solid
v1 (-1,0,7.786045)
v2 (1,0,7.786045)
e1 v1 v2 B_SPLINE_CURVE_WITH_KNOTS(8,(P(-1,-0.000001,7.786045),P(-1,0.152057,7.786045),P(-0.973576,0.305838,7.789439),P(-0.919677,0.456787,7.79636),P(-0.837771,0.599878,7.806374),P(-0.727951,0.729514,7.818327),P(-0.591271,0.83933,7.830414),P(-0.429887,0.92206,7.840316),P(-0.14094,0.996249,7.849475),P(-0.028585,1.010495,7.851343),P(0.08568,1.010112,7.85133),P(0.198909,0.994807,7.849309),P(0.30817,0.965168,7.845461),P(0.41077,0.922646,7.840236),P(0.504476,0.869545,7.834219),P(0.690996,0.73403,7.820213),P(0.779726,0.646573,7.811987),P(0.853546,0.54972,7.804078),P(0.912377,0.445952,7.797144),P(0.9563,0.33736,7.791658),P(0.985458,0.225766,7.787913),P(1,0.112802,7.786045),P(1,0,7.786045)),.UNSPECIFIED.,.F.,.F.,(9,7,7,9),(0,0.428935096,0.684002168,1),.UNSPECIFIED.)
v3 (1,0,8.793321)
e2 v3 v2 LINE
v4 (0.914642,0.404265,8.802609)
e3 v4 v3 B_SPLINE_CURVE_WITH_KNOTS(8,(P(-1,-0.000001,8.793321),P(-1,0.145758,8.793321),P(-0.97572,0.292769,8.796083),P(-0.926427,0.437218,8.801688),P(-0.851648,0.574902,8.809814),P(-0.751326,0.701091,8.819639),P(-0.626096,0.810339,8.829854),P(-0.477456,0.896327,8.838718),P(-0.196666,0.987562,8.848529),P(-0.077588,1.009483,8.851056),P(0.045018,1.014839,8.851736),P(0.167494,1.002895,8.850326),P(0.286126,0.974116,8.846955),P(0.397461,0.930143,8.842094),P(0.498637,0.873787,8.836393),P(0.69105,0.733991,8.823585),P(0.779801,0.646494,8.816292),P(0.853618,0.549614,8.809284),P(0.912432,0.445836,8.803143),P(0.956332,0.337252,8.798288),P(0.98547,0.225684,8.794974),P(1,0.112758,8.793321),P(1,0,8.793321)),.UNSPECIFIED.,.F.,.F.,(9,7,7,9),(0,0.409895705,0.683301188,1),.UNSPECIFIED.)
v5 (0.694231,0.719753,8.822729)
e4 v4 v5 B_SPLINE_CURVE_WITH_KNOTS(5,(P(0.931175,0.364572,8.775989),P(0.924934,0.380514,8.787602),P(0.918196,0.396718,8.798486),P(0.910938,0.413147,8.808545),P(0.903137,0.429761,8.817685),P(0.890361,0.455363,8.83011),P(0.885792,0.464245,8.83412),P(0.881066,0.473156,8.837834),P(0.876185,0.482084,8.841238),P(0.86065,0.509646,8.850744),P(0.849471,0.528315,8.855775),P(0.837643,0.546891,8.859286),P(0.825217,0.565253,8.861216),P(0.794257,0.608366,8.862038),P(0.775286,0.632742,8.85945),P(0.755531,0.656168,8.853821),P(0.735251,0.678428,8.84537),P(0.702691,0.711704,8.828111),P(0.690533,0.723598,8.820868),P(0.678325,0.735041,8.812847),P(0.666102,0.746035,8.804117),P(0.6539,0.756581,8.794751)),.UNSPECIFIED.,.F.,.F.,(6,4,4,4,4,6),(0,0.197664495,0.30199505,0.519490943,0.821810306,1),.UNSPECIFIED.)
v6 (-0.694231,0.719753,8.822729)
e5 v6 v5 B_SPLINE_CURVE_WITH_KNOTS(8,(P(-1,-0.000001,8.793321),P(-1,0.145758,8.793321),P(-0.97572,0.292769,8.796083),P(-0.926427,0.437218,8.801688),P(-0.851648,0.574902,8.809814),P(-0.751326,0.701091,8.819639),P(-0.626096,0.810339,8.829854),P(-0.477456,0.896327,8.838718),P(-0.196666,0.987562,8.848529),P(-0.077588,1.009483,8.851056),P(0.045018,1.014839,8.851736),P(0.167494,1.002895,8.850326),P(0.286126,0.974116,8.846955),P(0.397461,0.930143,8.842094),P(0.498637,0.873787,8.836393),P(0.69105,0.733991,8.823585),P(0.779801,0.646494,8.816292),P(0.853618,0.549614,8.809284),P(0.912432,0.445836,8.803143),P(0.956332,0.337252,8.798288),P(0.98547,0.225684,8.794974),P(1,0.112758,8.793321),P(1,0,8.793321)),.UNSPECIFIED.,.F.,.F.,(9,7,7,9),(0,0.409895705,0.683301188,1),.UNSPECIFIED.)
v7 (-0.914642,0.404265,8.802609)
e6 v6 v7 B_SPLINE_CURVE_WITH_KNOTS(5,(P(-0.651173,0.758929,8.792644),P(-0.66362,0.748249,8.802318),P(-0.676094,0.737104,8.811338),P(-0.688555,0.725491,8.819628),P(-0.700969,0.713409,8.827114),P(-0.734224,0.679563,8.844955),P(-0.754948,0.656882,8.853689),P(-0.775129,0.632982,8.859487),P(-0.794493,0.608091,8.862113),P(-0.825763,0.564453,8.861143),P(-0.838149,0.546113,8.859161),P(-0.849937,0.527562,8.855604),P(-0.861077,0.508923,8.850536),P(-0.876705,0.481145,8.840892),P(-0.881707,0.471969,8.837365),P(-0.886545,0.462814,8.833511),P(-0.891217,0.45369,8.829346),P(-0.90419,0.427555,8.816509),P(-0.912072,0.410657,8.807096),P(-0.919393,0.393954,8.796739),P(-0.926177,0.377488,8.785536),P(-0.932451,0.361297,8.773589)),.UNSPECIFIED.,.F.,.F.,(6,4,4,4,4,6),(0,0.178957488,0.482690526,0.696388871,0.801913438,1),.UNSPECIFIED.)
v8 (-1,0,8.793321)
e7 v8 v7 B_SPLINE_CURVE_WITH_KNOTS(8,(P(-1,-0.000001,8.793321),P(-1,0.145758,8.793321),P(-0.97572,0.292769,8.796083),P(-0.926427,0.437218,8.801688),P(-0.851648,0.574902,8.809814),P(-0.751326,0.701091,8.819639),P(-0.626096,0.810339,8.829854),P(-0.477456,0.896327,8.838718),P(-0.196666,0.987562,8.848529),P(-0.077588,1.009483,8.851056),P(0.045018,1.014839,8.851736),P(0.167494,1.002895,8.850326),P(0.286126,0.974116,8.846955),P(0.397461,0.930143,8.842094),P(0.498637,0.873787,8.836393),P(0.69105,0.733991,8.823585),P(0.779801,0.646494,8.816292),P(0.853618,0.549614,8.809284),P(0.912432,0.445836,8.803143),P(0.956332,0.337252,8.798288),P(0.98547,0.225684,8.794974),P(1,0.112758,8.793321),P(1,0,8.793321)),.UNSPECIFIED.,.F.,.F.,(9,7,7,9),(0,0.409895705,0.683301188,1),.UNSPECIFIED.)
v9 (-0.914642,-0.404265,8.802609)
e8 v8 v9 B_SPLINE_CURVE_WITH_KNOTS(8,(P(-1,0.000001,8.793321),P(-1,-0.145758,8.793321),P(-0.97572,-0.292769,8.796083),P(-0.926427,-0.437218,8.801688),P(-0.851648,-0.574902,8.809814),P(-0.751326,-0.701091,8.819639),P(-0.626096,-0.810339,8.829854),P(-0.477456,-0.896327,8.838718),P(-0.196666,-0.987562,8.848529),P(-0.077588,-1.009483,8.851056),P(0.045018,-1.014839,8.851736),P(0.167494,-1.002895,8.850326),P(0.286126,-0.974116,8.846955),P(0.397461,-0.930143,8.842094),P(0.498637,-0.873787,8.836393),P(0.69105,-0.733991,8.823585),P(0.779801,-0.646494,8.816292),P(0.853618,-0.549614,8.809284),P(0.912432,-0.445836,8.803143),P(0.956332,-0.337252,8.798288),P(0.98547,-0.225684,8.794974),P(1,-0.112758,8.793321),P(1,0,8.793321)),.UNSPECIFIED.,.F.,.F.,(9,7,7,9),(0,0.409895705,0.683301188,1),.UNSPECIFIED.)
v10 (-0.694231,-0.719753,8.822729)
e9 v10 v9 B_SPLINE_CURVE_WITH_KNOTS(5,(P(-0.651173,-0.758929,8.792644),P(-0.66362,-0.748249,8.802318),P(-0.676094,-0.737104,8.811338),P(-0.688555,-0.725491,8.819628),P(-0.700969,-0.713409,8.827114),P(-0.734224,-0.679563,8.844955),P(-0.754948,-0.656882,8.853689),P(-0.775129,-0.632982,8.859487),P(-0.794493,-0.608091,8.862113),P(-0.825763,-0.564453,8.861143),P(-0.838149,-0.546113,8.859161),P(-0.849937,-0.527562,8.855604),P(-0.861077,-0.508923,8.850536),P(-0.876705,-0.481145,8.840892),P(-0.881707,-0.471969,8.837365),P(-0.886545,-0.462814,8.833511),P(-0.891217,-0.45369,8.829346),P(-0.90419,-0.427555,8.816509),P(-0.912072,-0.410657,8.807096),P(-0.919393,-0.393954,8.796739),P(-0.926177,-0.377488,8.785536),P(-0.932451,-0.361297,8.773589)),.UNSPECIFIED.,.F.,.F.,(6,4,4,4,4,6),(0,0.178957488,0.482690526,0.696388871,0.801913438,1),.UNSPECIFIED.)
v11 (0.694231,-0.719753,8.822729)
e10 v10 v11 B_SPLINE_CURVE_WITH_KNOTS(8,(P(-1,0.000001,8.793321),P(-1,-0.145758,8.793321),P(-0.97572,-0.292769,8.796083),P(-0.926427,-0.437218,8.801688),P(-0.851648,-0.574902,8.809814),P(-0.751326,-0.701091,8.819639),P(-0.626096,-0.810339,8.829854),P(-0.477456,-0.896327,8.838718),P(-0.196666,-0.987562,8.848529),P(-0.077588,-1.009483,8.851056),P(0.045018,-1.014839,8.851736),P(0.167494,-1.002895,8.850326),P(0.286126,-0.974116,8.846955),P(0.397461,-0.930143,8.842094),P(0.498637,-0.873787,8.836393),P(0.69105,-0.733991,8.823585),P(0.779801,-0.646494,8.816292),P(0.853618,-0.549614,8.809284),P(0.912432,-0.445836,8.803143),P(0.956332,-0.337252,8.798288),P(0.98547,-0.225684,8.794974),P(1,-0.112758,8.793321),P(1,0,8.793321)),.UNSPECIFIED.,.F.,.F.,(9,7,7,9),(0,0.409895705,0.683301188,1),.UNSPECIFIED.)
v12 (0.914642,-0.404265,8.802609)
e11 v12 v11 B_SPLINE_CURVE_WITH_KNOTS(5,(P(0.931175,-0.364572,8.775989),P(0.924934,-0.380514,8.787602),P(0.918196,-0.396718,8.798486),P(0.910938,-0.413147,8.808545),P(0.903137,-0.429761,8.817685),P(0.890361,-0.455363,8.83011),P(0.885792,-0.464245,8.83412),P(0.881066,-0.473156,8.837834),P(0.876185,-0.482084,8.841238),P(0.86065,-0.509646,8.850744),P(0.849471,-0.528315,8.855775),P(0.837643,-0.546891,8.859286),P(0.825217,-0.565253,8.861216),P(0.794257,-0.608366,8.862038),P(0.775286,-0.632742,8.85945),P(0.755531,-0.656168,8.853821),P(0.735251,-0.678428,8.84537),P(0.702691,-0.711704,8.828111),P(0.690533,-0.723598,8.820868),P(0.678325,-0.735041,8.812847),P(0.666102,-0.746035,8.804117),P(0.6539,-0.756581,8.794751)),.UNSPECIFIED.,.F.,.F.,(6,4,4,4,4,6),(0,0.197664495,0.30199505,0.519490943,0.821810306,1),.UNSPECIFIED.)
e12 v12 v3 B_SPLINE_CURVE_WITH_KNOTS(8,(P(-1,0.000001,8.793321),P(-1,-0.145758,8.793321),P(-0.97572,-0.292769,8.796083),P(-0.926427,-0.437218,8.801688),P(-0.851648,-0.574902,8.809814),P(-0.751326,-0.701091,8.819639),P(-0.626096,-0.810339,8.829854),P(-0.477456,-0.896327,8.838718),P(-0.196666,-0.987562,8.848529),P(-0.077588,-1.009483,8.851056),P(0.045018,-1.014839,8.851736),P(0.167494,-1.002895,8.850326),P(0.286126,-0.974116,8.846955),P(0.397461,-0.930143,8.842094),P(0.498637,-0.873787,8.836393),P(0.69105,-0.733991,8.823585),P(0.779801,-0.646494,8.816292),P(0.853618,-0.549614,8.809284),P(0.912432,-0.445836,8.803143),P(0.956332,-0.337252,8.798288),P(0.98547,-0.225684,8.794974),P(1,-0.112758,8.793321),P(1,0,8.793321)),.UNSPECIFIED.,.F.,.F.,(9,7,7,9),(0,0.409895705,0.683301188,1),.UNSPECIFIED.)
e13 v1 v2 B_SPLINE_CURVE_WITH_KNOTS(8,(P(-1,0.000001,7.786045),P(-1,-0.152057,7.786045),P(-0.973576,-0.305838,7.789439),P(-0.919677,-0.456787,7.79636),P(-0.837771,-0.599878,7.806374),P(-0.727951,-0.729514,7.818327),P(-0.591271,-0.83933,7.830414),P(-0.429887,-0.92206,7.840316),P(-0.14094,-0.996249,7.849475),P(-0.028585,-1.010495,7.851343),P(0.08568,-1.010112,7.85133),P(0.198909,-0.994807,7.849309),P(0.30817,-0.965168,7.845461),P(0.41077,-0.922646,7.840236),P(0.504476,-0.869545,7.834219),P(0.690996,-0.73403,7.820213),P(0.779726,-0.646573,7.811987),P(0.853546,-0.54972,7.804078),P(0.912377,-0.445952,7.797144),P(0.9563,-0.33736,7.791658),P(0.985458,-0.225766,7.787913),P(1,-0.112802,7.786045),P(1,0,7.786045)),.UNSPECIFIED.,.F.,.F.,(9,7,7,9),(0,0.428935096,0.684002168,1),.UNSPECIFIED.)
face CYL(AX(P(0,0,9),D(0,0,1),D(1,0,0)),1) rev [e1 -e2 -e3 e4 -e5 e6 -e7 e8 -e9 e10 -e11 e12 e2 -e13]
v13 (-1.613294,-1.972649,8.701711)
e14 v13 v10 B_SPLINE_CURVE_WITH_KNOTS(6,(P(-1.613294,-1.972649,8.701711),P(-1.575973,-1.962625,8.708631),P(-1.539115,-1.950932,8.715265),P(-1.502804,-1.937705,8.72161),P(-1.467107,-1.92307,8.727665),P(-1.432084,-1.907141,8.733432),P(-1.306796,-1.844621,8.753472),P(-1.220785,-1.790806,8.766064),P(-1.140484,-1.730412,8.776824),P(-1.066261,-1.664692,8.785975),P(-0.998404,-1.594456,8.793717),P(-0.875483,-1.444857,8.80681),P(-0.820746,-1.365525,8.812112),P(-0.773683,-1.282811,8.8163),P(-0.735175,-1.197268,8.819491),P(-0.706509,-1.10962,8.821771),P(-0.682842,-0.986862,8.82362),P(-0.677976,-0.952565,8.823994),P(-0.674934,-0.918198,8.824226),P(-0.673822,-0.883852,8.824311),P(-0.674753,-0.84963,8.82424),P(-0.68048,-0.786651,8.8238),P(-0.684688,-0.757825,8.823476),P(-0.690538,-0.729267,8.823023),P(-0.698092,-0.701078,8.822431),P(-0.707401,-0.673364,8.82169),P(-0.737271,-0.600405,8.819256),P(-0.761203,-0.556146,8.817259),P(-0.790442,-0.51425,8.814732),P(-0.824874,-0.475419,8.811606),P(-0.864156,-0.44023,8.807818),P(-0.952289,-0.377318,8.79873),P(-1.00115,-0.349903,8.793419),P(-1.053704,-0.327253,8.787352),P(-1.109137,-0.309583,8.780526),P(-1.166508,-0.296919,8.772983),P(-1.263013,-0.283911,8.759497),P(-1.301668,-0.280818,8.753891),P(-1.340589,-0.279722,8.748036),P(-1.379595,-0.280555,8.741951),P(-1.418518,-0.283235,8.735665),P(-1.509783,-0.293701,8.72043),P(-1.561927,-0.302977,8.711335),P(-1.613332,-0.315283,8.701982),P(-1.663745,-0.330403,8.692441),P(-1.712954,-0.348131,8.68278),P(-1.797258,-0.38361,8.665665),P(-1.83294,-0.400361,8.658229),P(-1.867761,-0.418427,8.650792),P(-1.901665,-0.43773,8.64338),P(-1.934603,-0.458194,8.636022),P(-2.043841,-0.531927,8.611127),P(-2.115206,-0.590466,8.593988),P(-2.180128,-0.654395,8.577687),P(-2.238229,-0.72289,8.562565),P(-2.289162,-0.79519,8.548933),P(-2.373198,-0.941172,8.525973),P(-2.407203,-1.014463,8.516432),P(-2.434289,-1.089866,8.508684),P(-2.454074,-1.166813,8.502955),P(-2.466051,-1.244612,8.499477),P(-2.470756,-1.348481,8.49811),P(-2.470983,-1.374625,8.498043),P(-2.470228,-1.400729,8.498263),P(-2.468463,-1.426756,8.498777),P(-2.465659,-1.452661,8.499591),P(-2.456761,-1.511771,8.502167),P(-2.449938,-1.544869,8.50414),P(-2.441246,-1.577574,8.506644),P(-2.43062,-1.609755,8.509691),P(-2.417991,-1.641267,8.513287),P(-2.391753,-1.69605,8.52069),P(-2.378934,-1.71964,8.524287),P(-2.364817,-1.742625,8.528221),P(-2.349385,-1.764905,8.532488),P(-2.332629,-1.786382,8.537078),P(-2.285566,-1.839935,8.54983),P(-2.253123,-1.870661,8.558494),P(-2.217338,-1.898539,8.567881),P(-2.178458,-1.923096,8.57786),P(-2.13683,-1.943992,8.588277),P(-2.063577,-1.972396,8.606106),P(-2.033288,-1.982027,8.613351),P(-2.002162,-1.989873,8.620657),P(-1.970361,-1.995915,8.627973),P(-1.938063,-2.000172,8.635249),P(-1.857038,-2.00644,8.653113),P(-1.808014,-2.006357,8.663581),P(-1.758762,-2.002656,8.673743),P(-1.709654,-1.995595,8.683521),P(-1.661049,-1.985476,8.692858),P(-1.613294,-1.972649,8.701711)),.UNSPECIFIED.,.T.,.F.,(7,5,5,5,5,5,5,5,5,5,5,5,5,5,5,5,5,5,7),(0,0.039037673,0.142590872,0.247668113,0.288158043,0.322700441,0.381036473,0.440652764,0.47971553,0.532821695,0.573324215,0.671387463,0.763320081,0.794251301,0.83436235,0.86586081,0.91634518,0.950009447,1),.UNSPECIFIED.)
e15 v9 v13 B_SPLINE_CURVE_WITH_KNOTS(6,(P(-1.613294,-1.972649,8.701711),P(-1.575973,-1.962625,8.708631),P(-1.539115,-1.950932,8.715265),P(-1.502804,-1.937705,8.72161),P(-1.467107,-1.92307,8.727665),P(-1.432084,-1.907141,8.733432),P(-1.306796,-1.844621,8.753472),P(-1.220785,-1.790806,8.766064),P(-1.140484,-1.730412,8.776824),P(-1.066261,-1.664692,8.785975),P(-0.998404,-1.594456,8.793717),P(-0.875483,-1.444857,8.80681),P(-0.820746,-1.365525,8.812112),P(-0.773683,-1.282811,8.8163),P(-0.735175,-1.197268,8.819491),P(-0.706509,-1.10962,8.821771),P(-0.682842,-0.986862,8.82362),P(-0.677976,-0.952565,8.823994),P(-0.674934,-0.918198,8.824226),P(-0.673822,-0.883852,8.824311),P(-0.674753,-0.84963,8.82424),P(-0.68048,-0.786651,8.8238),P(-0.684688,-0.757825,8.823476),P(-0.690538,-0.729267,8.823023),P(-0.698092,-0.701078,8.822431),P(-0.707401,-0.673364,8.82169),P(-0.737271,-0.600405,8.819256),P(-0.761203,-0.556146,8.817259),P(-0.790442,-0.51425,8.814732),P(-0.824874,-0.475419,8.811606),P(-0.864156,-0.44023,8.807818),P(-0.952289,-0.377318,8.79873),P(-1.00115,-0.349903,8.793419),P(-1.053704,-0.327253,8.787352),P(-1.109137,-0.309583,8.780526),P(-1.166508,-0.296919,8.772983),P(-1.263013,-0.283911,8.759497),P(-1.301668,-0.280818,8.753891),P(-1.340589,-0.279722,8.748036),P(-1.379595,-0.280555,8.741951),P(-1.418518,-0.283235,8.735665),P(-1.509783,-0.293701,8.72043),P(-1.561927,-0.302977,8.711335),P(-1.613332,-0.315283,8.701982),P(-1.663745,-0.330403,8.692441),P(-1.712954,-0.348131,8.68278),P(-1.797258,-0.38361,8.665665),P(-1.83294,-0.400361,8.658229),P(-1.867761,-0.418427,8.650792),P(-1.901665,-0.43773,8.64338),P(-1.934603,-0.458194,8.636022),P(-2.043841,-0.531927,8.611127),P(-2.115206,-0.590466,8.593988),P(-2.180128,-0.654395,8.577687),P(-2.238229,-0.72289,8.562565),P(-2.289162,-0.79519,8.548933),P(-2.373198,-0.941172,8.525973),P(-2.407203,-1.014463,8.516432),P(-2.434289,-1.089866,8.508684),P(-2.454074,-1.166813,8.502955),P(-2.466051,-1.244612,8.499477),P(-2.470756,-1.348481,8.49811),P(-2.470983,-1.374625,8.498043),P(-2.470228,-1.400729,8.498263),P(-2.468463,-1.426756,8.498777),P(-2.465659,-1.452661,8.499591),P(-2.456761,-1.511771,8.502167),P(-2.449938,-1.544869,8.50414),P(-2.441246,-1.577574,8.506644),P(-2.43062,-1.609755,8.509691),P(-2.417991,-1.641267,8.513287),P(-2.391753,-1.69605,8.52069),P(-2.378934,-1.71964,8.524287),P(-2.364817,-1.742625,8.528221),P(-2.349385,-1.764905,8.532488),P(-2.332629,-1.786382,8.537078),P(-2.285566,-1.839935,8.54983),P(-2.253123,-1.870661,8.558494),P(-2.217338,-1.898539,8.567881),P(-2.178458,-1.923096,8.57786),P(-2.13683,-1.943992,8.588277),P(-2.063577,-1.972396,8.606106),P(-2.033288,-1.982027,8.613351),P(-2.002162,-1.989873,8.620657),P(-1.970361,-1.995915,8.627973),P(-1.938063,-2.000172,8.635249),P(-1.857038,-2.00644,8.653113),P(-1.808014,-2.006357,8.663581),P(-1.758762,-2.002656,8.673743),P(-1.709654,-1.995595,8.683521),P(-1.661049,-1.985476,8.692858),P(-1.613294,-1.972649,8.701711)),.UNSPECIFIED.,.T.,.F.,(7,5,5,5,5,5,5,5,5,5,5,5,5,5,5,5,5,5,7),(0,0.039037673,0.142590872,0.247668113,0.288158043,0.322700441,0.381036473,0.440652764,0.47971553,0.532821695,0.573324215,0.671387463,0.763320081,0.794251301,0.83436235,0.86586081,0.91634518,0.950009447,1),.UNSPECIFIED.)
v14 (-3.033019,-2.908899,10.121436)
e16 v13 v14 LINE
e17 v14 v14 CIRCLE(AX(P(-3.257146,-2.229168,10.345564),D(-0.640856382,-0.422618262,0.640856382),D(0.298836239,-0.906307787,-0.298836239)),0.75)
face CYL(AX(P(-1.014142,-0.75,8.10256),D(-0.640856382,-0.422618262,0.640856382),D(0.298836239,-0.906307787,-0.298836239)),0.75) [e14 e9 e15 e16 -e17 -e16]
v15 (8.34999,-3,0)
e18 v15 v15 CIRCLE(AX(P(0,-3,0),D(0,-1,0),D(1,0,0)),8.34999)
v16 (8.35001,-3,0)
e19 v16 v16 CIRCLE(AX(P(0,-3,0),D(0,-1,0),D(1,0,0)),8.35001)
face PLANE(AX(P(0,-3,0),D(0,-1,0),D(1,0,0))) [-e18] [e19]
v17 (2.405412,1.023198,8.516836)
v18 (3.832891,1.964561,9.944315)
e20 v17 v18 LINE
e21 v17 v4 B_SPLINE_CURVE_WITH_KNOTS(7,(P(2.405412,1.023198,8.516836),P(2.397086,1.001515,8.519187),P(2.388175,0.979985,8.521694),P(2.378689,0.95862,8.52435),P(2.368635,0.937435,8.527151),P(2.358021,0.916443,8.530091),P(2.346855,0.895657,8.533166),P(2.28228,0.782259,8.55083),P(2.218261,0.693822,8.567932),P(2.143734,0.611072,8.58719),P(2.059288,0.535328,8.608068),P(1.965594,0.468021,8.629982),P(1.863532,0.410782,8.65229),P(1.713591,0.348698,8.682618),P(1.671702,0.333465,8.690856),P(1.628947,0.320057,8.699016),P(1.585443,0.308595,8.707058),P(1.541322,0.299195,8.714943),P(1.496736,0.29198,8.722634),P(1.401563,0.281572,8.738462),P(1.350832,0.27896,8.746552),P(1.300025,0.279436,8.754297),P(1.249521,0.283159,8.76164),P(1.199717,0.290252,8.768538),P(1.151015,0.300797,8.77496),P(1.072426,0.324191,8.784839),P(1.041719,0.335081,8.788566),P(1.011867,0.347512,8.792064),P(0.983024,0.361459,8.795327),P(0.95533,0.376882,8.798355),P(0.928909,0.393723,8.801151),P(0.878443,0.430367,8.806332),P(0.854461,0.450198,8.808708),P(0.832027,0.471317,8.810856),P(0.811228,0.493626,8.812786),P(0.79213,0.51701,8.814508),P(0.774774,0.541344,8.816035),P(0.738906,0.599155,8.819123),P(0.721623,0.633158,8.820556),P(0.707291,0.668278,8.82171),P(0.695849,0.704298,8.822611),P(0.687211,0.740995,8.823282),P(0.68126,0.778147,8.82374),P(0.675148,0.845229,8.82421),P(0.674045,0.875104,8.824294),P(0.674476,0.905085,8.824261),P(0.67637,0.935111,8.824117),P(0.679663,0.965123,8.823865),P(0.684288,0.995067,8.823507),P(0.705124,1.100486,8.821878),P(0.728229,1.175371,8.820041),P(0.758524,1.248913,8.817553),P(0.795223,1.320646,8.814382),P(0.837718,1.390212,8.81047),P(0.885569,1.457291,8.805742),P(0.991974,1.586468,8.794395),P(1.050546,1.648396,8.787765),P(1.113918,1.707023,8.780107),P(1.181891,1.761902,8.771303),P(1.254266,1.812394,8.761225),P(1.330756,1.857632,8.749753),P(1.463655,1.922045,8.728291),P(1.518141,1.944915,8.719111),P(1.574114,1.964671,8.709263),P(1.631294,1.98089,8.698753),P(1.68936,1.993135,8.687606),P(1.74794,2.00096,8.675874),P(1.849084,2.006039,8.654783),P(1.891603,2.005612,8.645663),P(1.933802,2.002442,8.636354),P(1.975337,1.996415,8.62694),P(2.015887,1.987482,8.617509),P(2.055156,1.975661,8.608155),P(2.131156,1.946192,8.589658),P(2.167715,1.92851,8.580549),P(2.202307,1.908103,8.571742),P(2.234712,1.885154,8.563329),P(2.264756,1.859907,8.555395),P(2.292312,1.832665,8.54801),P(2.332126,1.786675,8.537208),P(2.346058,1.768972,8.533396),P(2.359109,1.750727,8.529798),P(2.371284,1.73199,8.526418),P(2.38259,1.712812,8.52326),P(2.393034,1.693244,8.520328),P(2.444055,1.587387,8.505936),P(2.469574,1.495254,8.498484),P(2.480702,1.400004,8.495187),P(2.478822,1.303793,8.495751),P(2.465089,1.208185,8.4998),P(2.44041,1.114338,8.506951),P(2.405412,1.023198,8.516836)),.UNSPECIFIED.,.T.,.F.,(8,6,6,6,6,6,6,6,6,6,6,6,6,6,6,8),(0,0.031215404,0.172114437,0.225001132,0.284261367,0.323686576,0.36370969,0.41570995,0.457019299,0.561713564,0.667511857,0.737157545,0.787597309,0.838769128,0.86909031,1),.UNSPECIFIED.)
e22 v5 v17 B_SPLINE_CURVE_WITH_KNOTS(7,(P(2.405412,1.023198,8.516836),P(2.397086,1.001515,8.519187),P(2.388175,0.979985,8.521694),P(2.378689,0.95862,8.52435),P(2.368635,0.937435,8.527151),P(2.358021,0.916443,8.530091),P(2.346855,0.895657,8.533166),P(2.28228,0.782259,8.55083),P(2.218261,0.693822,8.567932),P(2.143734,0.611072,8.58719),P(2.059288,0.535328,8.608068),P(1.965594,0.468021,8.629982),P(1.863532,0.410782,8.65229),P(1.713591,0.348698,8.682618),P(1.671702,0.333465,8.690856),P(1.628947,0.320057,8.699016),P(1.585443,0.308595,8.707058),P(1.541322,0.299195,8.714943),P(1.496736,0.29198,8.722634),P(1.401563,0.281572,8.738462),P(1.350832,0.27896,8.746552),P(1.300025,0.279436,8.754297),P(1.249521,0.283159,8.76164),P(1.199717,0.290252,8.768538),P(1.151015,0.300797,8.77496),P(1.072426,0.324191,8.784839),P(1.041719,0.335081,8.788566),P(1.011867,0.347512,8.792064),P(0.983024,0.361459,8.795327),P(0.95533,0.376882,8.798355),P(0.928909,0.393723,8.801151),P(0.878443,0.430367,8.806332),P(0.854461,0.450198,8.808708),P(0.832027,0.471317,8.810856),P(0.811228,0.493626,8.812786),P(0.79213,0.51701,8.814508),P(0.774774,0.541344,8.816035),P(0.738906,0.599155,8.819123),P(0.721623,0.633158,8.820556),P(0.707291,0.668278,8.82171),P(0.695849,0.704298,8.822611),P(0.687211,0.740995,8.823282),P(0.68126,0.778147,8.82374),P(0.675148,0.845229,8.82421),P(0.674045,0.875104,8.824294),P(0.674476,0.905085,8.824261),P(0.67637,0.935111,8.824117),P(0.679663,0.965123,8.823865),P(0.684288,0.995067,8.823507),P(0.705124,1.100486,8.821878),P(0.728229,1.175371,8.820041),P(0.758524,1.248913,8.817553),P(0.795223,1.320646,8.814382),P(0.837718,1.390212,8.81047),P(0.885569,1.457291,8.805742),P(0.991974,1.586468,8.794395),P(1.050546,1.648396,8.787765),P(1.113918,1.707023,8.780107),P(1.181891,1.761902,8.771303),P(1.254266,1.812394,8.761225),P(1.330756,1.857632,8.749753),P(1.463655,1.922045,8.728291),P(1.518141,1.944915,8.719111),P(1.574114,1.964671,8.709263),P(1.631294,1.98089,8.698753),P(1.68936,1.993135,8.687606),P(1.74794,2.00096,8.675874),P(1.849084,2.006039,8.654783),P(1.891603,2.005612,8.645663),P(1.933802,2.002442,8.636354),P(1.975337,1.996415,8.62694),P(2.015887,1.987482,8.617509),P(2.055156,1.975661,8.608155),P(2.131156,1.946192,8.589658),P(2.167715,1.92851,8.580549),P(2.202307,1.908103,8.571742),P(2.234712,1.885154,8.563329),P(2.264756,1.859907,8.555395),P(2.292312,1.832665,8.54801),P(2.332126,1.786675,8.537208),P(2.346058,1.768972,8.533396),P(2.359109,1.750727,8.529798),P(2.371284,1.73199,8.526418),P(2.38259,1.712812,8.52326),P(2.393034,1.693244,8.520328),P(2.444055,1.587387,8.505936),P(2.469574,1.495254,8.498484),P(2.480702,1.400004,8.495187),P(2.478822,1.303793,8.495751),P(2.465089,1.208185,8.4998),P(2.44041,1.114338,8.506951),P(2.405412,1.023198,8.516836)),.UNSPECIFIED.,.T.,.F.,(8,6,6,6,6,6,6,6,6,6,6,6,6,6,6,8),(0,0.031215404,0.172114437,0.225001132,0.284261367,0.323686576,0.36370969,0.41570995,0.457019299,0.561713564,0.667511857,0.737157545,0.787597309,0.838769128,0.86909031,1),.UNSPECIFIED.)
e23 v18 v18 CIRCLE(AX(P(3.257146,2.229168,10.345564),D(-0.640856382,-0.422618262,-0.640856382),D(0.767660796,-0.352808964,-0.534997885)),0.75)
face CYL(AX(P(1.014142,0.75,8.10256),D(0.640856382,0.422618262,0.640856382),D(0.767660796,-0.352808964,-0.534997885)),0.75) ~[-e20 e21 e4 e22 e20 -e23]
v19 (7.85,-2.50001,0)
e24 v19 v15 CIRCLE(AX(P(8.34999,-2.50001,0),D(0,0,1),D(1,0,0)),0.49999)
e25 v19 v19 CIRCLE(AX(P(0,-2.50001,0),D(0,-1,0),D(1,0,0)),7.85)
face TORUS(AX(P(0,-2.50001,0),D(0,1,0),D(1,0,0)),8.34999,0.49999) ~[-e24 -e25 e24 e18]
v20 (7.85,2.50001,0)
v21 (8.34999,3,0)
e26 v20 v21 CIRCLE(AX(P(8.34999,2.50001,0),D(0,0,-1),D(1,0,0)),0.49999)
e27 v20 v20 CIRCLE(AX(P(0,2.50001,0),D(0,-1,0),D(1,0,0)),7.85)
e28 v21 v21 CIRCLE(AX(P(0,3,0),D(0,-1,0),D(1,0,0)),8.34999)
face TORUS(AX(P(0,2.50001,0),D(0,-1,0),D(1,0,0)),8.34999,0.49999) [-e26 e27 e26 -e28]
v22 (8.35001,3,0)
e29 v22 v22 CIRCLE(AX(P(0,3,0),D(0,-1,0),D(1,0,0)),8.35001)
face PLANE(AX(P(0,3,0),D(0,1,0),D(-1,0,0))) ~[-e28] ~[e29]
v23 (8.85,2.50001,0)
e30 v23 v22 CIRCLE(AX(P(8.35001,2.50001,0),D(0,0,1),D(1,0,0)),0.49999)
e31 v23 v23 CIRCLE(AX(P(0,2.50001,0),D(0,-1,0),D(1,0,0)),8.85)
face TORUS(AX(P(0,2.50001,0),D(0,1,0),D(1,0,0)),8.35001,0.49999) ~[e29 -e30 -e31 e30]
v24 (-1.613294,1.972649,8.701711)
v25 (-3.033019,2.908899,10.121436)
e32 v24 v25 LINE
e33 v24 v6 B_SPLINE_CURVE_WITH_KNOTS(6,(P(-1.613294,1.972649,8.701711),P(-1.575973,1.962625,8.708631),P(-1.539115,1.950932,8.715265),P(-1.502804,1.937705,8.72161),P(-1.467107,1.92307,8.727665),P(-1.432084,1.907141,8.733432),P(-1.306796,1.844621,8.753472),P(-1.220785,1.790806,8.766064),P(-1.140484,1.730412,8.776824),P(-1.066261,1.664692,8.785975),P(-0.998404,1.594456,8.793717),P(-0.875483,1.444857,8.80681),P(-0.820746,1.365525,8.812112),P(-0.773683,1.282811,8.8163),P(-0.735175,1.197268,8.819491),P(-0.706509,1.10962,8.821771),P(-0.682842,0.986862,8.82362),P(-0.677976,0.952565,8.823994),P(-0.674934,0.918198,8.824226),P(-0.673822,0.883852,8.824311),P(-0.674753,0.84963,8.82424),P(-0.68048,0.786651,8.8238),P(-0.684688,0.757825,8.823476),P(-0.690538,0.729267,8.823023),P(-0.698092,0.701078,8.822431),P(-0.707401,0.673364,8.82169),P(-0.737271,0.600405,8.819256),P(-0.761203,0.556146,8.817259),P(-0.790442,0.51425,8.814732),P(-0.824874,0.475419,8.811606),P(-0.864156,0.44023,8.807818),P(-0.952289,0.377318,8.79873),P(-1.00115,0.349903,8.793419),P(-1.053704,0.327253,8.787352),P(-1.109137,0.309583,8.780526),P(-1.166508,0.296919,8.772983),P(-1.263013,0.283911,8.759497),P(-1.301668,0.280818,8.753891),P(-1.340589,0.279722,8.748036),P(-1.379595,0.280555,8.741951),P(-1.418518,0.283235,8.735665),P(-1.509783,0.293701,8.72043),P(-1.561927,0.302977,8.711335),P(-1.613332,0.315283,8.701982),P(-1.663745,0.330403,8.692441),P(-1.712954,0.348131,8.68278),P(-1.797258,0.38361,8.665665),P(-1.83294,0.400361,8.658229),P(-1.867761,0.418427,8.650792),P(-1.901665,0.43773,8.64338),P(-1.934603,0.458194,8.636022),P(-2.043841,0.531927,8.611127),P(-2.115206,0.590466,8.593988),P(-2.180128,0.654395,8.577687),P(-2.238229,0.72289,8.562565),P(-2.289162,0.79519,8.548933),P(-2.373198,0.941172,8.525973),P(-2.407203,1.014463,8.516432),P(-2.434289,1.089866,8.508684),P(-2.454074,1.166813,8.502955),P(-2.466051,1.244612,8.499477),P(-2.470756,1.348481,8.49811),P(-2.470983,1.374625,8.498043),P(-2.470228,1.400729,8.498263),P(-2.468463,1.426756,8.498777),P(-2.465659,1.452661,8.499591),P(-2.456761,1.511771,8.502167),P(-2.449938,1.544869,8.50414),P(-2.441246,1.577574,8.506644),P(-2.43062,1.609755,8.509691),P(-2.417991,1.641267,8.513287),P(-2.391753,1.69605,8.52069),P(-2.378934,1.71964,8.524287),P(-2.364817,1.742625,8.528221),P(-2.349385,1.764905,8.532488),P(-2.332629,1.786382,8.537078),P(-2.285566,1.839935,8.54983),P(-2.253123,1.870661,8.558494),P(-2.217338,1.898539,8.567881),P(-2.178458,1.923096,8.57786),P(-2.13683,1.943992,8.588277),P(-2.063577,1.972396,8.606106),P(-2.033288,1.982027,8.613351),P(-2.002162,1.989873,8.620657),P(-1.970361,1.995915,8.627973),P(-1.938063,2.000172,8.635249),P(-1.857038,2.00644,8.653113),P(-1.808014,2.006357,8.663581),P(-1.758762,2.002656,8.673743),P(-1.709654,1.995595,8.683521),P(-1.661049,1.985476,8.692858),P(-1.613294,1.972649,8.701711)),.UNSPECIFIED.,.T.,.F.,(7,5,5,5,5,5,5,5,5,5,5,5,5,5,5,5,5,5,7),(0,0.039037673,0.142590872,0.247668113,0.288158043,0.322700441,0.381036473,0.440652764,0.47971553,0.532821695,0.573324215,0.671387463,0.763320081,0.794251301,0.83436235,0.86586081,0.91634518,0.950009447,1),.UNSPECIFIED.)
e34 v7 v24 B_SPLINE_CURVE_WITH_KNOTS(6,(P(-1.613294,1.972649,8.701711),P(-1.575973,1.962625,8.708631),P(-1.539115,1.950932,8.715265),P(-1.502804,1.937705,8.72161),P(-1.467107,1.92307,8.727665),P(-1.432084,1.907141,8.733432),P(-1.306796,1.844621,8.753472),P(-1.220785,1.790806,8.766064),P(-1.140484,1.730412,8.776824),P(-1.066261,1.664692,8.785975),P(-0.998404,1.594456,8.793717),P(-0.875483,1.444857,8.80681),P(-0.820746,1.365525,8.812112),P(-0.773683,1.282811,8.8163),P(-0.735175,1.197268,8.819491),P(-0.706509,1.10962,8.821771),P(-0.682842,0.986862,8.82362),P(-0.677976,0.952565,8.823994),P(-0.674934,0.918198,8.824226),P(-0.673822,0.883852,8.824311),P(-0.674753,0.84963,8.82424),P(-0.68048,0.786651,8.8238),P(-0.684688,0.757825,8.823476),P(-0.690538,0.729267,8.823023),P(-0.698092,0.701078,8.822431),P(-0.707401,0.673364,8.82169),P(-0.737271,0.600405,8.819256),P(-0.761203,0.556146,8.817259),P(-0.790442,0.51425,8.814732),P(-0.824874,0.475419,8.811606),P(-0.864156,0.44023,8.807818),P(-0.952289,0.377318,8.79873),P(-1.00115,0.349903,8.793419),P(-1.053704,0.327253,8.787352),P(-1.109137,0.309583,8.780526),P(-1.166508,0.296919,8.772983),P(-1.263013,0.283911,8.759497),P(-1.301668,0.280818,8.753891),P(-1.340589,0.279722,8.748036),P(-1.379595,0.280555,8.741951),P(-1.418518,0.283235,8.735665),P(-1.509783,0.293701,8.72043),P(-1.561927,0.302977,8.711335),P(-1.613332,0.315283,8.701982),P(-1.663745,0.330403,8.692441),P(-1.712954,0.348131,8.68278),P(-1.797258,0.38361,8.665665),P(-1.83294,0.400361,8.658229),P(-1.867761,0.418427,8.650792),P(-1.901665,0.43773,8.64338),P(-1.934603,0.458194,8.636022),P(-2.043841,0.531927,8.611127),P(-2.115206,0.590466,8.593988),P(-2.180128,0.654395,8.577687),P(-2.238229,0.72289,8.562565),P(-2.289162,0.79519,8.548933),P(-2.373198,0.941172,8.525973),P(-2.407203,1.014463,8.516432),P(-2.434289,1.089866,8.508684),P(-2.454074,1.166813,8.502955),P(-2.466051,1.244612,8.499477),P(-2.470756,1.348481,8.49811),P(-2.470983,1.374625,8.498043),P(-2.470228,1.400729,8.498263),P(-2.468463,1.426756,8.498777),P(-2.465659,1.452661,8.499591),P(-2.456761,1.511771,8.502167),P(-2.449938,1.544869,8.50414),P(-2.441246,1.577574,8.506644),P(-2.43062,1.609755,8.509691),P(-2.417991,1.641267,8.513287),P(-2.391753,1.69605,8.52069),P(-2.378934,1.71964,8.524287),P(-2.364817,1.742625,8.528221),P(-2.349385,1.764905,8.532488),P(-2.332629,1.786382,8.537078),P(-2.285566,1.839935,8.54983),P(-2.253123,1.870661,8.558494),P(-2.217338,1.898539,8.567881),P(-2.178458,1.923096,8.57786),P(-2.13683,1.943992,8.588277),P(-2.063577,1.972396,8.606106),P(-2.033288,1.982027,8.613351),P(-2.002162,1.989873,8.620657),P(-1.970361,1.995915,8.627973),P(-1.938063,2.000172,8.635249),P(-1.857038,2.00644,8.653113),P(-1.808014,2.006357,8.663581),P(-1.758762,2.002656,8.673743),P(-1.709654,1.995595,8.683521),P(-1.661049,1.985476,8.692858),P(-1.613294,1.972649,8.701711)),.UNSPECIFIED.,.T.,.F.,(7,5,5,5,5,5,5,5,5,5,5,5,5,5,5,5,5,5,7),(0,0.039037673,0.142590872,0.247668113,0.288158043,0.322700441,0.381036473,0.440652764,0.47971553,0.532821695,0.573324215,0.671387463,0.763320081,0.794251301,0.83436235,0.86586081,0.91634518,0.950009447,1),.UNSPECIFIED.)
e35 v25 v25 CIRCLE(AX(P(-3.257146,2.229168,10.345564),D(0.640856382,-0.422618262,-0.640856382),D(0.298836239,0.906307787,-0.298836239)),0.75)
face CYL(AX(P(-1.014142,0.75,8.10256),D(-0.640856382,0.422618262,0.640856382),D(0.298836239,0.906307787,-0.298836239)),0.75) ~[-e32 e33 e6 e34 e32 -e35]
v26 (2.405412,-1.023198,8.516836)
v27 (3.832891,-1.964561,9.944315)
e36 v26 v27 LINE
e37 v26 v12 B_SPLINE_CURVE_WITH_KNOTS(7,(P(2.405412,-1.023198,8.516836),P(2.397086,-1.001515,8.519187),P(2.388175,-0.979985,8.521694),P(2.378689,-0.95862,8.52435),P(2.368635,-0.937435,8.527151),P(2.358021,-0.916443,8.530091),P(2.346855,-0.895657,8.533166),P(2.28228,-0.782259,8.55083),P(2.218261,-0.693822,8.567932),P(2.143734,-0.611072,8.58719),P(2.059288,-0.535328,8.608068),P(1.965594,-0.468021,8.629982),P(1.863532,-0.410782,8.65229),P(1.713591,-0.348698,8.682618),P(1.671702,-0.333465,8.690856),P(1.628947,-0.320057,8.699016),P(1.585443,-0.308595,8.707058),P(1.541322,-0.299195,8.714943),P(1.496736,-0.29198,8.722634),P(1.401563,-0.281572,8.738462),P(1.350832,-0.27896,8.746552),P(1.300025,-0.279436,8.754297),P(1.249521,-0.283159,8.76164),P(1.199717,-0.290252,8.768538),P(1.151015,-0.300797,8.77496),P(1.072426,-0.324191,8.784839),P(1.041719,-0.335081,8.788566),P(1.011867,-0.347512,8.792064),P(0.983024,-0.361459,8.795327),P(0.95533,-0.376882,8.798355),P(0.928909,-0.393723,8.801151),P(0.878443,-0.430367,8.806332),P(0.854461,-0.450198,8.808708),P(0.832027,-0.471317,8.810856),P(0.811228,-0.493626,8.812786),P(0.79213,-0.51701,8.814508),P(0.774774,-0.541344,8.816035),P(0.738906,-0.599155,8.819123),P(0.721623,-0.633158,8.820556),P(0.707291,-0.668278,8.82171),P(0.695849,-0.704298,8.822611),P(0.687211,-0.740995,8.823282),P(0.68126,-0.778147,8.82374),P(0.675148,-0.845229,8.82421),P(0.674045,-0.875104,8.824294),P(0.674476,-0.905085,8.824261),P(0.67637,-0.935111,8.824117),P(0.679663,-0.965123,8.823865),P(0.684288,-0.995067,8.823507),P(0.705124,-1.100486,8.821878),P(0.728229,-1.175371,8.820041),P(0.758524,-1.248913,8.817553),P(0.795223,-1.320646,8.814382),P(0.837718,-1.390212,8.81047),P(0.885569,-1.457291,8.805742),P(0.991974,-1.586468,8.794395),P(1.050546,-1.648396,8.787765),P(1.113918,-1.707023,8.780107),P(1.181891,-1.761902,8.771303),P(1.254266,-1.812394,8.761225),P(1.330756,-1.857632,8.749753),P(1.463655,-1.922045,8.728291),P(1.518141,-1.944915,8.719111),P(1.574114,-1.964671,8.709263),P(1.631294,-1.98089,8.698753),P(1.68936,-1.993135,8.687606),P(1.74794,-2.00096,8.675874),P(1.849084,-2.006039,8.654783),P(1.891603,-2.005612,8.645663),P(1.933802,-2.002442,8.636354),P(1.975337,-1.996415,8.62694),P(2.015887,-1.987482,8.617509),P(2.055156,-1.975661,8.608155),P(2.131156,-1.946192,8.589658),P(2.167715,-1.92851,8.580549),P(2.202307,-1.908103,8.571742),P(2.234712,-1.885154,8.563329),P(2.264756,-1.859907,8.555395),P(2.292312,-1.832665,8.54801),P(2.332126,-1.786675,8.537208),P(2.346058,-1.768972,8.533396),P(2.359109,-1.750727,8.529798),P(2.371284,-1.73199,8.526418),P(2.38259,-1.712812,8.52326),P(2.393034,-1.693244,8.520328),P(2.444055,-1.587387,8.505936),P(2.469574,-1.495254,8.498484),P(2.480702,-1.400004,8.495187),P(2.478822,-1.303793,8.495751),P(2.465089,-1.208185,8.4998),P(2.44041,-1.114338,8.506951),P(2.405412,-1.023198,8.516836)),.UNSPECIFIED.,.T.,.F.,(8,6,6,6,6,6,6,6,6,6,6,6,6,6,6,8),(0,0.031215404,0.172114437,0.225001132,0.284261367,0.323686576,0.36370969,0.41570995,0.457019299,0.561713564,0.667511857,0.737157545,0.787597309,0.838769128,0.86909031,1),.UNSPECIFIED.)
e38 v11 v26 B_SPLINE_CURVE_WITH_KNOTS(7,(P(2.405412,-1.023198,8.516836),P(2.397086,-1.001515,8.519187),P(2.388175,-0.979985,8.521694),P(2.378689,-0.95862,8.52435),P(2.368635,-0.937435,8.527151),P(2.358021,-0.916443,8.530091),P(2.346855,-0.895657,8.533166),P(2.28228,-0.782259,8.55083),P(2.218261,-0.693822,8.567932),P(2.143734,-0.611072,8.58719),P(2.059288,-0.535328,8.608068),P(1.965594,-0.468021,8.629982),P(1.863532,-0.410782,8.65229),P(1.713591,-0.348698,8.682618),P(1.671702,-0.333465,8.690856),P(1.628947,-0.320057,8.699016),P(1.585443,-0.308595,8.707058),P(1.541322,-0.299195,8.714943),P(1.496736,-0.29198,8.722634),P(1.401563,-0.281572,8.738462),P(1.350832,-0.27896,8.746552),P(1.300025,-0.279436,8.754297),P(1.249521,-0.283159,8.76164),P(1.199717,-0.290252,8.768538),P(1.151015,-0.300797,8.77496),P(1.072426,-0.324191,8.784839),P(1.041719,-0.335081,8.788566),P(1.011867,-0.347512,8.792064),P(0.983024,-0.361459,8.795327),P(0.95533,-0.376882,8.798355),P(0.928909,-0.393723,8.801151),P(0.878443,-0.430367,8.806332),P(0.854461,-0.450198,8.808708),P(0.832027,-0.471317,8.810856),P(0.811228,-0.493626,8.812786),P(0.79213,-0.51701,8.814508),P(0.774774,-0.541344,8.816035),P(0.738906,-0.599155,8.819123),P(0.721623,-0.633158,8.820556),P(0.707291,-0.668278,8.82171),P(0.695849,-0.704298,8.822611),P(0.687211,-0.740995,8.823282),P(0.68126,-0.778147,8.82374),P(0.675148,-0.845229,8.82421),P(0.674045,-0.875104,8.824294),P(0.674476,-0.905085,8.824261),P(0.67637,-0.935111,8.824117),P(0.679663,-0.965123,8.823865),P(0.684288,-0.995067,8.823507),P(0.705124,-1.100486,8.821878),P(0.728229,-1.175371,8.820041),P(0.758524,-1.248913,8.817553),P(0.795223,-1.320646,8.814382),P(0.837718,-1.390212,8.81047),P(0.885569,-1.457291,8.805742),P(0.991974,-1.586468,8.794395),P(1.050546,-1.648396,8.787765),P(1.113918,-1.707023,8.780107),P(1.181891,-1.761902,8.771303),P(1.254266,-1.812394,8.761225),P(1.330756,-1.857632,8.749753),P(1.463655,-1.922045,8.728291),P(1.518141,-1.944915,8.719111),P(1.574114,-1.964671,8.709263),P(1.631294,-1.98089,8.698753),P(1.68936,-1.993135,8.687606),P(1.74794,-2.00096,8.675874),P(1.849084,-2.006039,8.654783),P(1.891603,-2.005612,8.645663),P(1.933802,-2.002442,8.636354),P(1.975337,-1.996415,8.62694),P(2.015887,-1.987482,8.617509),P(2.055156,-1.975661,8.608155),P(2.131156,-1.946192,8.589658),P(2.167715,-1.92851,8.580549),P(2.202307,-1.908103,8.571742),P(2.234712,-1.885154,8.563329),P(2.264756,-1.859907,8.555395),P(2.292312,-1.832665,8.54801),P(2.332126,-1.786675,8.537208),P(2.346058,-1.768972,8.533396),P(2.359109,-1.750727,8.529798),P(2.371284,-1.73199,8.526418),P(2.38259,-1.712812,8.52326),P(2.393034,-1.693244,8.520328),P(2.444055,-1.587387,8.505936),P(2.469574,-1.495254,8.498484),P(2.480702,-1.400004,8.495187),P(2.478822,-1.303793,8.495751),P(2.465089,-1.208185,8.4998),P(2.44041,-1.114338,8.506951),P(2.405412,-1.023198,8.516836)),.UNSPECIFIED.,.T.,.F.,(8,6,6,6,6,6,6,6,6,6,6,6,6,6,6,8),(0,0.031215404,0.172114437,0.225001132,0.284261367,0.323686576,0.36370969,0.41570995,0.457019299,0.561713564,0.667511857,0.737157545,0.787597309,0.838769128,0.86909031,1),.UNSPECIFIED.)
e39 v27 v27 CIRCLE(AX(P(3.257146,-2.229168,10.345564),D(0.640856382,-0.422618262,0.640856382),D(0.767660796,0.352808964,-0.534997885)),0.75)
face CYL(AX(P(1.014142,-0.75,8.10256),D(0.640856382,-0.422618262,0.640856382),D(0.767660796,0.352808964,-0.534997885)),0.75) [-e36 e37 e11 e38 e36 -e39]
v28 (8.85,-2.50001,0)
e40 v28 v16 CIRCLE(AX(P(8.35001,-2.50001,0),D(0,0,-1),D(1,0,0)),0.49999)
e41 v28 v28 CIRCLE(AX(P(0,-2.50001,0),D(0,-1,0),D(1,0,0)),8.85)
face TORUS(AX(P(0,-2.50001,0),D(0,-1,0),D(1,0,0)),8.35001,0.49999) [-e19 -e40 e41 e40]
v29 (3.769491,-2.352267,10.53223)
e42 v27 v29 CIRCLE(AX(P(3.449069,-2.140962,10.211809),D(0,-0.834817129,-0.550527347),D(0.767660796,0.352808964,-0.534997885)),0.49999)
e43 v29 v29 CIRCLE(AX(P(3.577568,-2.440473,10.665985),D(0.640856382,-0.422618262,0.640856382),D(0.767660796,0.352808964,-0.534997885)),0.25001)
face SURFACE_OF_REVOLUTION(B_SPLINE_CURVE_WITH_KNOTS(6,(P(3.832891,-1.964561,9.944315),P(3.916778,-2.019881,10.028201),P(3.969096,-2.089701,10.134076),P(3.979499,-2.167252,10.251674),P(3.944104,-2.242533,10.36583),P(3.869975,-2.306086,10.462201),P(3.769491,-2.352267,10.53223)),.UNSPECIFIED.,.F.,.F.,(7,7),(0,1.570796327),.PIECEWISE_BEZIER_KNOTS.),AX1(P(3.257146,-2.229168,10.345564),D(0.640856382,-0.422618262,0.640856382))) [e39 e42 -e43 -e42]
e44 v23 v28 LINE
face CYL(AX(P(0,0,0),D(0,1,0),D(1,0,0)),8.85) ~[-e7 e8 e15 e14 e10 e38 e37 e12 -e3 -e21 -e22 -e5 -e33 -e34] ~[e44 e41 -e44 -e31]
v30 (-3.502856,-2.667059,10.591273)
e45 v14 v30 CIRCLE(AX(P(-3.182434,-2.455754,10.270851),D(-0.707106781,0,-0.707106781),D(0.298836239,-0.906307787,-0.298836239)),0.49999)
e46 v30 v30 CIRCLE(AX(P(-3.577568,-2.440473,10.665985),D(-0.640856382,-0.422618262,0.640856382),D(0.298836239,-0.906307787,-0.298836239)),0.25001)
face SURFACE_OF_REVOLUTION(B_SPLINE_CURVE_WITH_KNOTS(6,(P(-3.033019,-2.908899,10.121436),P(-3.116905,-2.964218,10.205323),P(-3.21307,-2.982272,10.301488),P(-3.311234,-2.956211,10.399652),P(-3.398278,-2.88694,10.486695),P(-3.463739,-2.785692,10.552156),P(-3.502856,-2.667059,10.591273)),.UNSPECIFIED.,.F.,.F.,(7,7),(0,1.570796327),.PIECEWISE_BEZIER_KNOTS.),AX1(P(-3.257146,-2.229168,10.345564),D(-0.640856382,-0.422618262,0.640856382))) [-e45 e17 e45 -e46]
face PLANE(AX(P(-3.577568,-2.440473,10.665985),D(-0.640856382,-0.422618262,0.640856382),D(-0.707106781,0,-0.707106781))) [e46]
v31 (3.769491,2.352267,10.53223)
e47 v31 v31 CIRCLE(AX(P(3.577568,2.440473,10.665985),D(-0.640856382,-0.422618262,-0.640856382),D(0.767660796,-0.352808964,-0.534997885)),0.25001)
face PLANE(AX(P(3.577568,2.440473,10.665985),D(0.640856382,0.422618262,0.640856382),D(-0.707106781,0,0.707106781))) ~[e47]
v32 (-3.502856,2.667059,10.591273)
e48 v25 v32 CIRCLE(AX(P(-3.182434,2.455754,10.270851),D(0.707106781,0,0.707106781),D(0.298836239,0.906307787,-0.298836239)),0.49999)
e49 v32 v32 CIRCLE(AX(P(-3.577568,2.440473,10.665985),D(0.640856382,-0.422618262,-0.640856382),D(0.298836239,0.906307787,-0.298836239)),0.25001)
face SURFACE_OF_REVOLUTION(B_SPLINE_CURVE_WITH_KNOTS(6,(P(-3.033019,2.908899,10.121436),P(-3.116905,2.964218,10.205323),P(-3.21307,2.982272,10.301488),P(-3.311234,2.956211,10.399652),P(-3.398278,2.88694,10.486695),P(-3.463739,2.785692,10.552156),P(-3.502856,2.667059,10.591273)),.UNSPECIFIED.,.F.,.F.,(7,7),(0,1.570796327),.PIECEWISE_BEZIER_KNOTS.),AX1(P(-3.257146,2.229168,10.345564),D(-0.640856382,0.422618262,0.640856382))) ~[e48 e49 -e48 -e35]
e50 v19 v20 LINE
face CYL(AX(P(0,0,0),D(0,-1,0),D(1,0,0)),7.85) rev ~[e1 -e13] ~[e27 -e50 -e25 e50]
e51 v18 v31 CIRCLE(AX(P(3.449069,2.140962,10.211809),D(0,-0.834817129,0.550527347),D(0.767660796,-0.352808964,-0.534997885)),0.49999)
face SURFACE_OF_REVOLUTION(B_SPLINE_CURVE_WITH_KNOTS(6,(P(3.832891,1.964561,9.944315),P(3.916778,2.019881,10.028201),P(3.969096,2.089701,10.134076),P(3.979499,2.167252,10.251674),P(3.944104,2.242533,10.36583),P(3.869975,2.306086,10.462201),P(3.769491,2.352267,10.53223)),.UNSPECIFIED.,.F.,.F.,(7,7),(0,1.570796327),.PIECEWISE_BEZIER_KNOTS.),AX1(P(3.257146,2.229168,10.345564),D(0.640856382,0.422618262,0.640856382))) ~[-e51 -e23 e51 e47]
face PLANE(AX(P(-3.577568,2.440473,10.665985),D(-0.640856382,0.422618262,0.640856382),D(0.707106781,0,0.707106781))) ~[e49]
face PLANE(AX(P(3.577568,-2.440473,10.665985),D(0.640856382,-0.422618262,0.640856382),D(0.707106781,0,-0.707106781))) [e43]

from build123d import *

# Parameters (mm, degrees)
F0_R      = 8.85
F0_R_2    = 7.85
F1_DEPTH  = 3
F10_R     = 0.75
F11_R     = 0.75
F15_R     = 1
F16_DEPTH = 9
F18_R     = 7.85
F19_DEPTH = 25
F20_R     = 0.49999


# Not quite as in the source:
# - a fillet or chamfer is up to 0.001 mm smaller than in the source, because OpenCascade refuses the exact size


with BuildPart() as f1:
    # F0 (on Front) → F1 (new body)
    with BuildSketch(Plane.XZ):
        Circle(F0_R)
        Circle(F0_R_2, mode=Mode.SUBTRACT)
    extrude(amount=F1_DEPTH)

    # F12: sweep along a path in F6
    with BuildLine(Plane(origin=(-3.5442088225, 0, 3.5442088225), x_dir=(0, 1, 0), z_dir=(0.7071067812, 0, -0.7071067812))) as f12_path:
        Line((-0.75, 6.446481747), (-2.440473047, 10.0717128952))
    # F10 (on line) → F12 (sweep)
    with BuildSketch(Plane(origin=(6.5107549732, -4.2935734533, 6.5107549732), x_dir=(0.7676607959, 0.3528089641, -0.5349978853), z_dir=(0.6408563821, -0.4226182617, 0.6408563821))):
        with Locations((-3.8209419121, 3.8345678968)):
            Circle(F10_R)
    sweep(path=f12_path.line)

    # F13: sweep along a path in F7
    with BuildLine(Plane(origin=(3.5442088225, 0, 3.5442088225), x_dir=(0, 1, 0), z_dir=(0.7071067812, 0, 0.7071067812))) as f13_path:
        Line((-0.75, 6.446481747), (-2.440473047, 10.0717128952))
    # F11 (on line) → F13 (sweep)
    with BuildSketch(Plane(origin=(-6.5107549732, -4.2935734533, 6.5107549732), x_dir=(0.2988362387, -0.906307787, -0.2988362387), z_dir=(-0.6408563821, -0.4226182617, 0.6408563821))):
        with Locations((-2.04467007, 5.0122681847)):
            Circle(F11_R)
    sweep(path=f13_path.line)

    # F15 (on offset) → F16 (cut)
    with BuildSketch(Plane.XY.offset(9)):
        Circle(F15_R)
    extrude(amount=-F16_DEPTH, mode=Mode.SUBTRACT)

    # F17: F1 across face


with BuildPart() as f1_1:
    add(f1.part)
    add(f1.part.mirror(Plane(origin=(0, 0, -0.3309567353), x_dir=(1, 0, 0), z_dir=(0, 1, 0))))

    # F18 (on face) → F19 (cut)
    with BuildSketch(Plane.XZ.offset(3)):
        Circle(F18_R)
    extrude(amount=-F19_DEPTH, mode=Mode.SUBTRACT)

    # F20 (radius 0.5 in the source; OpenCascade refuses exactly that, so slightly less here)
    f20_edges = [f1_1.edges().sort_by_distance(p)[0] for p in [
        (-8.85, -3, 0),
        (-7.85, -3, 0),
        (-8.85, 3, 0),
        (-7.85, 3, 0),
        (3.001822, 2.70508, 11.067234),
        (3.001822, -2.70508, 11.067234),
        (-3.801695, -1.760742, 10.890112),
        (-3.801695, 1.760742, 10.890112),
    ]]
    fillet(f20_edges, radius=F20_R)


solid = f1_1.part
